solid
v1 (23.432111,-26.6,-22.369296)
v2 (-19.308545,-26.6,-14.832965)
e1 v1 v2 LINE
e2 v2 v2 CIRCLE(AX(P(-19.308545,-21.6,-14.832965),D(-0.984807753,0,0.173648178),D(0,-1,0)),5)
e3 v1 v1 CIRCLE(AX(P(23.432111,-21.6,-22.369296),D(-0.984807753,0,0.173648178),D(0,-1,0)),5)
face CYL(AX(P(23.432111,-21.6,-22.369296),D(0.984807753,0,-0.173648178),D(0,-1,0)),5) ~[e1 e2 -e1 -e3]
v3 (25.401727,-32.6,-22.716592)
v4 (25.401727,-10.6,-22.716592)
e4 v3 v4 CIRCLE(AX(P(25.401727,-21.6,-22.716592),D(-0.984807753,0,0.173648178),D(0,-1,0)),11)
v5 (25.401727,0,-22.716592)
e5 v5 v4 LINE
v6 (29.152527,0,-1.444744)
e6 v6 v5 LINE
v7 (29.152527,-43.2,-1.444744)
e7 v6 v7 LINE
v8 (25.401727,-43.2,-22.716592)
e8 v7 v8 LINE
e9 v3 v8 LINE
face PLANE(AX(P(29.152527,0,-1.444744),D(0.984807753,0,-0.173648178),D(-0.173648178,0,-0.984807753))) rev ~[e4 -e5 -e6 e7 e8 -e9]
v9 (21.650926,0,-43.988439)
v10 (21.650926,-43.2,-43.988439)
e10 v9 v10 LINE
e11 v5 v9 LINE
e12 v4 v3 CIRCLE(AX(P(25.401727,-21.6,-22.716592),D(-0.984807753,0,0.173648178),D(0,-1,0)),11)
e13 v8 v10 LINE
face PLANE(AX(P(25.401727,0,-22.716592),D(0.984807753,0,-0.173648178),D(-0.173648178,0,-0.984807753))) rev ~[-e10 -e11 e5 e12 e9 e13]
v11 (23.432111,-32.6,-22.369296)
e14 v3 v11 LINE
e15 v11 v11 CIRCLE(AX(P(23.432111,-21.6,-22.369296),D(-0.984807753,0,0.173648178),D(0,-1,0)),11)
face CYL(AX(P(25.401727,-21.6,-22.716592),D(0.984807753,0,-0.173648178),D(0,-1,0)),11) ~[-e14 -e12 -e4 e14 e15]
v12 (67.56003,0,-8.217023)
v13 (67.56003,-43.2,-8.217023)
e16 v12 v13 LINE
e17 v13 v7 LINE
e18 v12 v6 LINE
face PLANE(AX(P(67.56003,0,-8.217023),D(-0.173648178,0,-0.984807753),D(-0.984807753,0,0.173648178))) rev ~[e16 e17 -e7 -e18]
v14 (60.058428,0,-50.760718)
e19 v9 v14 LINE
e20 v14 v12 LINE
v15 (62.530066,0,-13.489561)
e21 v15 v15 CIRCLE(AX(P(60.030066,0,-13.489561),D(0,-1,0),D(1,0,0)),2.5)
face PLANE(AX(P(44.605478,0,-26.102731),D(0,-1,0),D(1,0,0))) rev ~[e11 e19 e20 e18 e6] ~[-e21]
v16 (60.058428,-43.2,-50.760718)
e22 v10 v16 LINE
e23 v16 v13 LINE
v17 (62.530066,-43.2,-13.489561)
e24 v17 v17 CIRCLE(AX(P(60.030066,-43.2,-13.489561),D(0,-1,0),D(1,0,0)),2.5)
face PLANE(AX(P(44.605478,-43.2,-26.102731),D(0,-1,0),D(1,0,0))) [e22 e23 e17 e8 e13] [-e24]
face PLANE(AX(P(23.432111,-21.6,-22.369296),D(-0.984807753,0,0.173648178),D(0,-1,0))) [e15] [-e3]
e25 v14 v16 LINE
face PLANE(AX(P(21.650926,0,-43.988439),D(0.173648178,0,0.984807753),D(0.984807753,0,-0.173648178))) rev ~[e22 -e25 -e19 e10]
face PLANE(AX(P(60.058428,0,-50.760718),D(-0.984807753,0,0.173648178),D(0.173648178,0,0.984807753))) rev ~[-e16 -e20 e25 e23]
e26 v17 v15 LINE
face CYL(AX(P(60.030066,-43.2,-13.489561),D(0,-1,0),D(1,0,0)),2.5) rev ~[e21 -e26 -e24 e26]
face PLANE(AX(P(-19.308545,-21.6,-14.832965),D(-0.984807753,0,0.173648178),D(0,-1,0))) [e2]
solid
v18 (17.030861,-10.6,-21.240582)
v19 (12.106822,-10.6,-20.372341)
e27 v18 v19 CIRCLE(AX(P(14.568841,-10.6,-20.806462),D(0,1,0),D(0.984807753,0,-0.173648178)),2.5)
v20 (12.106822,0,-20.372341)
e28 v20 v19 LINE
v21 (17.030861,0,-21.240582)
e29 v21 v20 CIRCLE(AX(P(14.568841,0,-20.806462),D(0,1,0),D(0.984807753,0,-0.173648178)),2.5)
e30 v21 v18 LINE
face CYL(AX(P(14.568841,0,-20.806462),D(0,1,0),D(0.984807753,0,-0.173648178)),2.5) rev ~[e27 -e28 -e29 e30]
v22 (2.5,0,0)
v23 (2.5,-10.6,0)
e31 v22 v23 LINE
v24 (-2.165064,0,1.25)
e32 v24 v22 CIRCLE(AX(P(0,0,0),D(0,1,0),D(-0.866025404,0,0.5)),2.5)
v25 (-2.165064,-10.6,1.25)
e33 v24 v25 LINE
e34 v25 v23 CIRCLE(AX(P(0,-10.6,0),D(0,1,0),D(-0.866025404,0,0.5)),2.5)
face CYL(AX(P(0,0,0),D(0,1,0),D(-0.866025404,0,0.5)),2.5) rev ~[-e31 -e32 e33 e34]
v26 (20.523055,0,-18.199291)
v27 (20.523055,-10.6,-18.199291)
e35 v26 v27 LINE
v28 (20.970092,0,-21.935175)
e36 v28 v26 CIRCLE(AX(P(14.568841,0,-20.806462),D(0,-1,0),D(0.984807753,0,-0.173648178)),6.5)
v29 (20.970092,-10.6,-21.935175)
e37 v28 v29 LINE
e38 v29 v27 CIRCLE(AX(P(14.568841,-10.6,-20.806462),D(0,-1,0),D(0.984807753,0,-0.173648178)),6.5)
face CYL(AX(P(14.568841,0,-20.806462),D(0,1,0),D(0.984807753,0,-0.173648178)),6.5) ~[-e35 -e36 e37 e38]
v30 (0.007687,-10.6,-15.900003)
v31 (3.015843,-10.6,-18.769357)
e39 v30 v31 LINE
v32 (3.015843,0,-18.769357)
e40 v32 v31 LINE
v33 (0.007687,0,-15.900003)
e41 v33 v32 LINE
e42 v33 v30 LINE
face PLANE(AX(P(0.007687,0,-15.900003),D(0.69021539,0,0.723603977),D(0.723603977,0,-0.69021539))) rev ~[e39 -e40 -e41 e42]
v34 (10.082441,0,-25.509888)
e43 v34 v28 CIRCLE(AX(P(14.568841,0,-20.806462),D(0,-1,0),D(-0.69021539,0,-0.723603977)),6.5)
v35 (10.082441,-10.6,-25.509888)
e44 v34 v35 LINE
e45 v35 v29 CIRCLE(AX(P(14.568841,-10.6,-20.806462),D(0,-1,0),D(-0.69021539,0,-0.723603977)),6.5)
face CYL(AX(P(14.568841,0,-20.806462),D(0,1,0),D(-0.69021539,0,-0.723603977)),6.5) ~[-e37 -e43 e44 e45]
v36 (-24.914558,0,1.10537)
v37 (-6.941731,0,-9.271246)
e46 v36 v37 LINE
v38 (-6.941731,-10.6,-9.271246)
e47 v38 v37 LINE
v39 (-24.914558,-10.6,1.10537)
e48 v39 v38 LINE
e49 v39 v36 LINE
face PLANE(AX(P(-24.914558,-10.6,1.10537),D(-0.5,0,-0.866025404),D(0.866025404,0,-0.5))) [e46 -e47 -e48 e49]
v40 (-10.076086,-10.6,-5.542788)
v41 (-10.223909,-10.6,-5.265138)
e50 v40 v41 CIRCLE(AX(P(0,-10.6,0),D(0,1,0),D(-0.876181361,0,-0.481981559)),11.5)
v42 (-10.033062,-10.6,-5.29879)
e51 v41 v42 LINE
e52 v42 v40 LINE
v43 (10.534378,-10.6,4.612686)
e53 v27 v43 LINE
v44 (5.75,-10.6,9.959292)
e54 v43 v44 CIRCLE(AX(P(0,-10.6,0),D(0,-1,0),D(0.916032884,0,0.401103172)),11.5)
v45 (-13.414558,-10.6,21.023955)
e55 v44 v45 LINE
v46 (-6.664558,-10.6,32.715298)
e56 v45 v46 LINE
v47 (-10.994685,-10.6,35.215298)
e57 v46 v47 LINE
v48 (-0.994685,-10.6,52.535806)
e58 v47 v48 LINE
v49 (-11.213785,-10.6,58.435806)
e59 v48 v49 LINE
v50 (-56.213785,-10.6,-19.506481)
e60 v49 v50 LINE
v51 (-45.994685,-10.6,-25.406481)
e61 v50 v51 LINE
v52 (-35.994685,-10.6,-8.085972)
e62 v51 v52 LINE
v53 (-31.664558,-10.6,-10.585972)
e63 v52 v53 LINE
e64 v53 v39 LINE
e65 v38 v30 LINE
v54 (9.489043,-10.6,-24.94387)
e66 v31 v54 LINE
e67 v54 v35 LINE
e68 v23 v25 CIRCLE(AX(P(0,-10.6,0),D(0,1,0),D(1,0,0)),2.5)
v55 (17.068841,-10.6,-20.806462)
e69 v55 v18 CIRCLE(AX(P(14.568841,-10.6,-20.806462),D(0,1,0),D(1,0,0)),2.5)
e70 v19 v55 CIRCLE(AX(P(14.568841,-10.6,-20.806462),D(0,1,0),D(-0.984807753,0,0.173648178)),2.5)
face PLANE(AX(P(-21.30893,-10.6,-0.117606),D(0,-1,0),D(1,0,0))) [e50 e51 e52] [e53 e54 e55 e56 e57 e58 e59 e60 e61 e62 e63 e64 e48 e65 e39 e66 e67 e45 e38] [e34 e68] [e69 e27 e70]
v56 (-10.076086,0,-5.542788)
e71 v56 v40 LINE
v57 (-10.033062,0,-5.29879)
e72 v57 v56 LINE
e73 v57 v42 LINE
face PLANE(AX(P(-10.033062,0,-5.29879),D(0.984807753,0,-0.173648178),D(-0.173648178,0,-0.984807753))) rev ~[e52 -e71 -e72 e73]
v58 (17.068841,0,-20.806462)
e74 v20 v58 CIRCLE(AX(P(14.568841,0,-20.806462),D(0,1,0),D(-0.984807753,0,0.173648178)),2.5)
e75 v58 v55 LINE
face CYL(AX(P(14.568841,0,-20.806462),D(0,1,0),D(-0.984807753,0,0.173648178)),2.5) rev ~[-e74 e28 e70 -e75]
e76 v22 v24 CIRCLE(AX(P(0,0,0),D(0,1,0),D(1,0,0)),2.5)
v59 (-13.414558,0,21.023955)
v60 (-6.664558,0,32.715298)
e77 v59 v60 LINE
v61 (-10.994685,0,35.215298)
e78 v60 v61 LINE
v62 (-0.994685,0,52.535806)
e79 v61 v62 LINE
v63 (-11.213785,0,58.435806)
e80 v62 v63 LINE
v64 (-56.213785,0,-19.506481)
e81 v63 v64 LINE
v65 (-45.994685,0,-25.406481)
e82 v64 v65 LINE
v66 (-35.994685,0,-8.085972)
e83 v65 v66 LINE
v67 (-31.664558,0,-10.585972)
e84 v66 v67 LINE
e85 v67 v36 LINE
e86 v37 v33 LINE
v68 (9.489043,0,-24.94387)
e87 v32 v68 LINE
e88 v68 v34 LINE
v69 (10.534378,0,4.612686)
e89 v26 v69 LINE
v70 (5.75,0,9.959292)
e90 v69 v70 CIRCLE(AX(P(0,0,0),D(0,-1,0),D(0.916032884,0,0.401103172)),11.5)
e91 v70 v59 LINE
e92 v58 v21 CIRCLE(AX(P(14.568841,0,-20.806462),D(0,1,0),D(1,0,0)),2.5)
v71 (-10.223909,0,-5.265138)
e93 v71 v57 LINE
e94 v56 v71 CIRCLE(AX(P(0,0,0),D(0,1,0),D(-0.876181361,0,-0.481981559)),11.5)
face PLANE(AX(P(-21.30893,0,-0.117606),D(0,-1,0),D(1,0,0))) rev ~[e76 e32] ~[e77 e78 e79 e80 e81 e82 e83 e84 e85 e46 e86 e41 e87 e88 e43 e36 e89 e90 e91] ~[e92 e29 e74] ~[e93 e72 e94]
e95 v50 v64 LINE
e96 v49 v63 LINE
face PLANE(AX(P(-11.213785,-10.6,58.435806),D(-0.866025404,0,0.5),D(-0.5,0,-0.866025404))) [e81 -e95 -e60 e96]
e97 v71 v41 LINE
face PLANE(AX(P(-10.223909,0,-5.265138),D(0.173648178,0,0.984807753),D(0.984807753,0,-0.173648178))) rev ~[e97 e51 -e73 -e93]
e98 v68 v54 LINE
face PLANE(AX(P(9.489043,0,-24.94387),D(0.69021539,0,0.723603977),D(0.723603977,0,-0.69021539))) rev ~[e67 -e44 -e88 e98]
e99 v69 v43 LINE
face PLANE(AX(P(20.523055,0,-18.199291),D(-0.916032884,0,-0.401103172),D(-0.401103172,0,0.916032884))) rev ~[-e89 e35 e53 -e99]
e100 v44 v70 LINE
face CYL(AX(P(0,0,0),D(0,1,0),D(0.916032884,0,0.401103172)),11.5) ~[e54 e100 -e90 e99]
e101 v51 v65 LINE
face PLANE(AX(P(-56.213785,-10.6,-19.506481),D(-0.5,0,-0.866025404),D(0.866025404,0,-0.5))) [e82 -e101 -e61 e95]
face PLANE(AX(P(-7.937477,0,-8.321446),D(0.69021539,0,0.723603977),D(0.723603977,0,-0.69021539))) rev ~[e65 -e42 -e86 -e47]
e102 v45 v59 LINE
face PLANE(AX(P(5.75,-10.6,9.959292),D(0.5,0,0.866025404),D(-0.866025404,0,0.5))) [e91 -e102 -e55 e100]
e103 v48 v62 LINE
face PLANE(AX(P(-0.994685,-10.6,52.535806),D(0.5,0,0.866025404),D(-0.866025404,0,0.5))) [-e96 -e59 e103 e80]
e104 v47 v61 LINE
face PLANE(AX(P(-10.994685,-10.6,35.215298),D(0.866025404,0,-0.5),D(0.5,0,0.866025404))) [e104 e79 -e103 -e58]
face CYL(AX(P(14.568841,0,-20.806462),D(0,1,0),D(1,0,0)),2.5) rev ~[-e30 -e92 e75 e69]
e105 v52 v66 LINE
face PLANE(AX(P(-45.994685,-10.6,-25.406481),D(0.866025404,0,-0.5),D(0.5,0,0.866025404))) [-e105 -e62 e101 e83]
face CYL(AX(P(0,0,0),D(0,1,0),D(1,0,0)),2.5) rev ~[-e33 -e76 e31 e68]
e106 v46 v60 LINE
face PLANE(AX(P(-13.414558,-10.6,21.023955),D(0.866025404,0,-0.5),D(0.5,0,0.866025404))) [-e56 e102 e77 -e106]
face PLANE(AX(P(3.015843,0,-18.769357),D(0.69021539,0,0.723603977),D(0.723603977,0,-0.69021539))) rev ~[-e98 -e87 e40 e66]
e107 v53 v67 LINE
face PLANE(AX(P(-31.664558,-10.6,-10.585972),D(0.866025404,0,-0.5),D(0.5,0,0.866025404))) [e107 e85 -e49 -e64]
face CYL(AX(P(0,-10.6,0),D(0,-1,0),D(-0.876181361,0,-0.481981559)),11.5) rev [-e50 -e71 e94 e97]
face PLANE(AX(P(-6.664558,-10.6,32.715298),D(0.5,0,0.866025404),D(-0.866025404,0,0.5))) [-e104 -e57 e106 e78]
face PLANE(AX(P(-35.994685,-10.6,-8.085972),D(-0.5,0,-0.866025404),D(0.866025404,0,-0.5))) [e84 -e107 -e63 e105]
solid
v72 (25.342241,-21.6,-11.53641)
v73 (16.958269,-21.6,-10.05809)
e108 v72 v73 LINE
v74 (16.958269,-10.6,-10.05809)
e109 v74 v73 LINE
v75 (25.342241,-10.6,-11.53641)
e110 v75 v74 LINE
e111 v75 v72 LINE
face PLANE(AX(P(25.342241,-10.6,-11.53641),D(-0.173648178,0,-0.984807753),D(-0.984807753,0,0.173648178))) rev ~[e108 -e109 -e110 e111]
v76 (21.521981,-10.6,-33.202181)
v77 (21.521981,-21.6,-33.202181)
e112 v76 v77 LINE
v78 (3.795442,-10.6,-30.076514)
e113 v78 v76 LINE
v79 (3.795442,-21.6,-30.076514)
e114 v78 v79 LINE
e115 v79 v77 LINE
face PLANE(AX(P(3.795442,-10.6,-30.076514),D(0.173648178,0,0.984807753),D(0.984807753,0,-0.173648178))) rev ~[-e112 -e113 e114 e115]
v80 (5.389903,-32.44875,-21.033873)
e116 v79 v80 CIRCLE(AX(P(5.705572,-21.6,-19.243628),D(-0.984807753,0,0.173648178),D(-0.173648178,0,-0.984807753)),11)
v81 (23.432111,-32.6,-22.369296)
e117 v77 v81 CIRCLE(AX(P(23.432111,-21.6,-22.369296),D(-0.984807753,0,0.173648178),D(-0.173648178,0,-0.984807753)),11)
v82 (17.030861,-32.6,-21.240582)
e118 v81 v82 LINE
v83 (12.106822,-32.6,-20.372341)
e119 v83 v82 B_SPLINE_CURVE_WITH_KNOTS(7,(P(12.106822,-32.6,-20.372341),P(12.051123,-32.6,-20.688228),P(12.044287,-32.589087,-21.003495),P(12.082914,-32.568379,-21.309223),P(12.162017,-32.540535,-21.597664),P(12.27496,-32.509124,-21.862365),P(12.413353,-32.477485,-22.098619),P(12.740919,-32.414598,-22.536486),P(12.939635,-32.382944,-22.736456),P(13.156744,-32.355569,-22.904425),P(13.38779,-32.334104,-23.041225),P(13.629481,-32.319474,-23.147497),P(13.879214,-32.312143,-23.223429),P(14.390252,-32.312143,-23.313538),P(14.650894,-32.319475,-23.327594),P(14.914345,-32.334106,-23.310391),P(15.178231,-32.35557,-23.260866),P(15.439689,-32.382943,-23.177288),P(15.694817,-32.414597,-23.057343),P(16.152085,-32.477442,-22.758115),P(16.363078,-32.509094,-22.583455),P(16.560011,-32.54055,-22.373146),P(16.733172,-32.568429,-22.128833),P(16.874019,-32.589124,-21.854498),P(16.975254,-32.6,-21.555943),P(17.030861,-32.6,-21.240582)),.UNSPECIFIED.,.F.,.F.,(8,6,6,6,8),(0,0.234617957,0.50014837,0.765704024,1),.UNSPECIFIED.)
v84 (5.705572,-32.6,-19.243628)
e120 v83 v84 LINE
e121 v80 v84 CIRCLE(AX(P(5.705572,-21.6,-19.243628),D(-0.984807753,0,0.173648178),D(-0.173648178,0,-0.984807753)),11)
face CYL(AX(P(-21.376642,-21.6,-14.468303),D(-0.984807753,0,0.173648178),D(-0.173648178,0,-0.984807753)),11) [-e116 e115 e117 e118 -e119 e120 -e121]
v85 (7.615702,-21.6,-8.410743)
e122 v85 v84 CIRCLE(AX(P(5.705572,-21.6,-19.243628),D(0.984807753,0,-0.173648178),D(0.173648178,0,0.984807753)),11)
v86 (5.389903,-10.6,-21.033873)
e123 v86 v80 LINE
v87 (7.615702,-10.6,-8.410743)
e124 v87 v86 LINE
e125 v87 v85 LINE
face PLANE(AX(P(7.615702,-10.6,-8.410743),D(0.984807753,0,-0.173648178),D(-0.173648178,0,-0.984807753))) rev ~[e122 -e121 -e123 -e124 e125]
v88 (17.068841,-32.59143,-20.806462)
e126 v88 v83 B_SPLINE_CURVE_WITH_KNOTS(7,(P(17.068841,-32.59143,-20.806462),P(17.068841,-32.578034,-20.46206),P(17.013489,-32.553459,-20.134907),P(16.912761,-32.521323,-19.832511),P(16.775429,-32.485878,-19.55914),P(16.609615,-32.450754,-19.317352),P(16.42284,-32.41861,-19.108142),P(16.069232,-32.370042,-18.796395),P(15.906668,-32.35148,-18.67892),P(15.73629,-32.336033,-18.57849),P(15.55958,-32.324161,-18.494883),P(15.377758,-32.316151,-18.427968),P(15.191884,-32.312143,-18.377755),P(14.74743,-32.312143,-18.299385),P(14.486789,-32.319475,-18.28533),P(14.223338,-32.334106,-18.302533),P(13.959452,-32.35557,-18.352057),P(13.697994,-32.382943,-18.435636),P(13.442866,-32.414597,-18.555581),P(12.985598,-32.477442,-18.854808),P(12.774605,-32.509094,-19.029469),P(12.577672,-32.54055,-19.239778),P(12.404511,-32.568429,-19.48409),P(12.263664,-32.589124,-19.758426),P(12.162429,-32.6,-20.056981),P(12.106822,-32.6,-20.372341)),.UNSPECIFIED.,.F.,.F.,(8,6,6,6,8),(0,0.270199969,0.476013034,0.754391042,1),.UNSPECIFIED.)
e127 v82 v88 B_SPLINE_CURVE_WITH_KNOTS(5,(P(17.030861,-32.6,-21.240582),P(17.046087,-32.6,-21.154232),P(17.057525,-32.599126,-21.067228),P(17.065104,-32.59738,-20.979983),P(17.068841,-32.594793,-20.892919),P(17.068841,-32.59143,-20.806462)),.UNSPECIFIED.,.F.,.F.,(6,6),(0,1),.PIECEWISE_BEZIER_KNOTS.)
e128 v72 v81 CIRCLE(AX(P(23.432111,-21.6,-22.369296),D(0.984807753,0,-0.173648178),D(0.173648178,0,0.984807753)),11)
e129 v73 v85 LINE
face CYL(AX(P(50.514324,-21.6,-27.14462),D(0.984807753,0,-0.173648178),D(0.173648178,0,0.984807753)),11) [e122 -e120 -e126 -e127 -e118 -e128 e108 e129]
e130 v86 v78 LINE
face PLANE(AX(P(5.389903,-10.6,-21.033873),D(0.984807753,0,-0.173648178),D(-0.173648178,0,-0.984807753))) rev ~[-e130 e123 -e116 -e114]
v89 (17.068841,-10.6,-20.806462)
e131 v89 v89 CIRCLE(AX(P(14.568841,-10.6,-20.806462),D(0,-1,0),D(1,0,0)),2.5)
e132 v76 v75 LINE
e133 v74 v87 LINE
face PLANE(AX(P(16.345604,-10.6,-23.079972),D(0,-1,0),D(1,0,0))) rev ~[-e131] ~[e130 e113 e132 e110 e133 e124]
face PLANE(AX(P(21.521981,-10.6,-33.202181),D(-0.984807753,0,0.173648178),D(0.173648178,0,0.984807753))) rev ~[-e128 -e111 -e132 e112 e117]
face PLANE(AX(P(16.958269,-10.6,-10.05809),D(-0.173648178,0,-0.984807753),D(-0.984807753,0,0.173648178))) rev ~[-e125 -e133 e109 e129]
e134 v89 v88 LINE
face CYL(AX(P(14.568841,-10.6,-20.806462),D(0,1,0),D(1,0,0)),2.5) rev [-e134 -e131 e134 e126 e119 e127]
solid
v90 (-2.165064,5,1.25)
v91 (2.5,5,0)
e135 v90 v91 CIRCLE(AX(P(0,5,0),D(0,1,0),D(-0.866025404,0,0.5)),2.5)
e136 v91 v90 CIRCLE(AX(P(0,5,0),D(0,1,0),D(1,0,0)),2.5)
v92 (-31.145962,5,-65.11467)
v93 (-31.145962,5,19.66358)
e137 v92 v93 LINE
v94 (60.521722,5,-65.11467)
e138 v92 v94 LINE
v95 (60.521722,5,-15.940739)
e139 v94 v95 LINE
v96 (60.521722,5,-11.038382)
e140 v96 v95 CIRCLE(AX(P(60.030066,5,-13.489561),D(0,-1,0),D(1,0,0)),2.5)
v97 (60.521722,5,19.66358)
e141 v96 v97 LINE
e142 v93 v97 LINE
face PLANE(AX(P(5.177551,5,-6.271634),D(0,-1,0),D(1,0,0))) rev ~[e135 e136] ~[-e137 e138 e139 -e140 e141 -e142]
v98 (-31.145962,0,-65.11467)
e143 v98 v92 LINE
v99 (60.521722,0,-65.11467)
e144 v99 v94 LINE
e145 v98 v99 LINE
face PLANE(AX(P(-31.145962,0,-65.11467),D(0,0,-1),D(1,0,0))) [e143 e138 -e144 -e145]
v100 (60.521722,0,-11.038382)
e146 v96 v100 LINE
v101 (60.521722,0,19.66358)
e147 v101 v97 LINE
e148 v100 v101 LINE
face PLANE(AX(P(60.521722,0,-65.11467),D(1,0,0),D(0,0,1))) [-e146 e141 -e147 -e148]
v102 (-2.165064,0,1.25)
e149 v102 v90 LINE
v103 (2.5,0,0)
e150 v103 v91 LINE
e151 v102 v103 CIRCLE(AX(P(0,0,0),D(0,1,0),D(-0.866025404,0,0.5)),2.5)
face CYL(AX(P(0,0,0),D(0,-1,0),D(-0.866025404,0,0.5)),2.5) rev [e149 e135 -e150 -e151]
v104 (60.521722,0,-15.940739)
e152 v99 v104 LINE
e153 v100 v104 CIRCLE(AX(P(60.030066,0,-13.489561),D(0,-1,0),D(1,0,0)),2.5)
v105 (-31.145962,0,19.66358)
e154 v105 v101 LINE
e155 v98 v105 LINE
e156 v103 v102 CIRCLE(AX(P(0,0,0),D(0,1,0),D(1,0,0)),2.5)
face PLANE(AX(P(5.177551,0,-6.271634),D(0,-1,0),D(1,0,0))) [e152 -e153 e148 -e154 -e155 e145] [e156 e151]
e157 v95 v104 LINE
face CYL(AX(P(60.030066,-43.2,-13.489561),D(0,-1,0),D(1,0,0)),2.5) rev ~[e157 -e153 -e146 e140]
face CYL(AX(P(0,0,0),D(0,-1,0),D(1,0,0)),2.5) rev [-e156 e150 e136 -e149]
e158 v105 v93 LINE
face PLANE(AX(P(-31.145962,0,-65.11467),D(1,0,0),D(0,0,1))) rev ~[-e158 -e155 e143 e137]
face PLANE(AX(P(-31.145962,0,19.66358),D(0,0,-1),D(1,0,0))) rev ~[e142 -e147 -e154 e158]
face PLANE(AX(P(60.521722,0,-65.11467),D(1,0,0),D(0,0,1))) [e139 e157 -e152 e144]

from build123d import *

# Parameters (mm, degrees)
F1_DEPTH    = 10.6
F2_DEPTH    = 43.2
F3_R        = 11
F4_DEPTH    = 2
F5_R        = 5
F6_DEPTH    = 43.4
F7_R        = 2.5
F8_DEPTH    = 22
F9_T1_DEPTH = 73
F9_T3_DEPTH = 73
F10_W       = 91.6676837951
F10_H       = 84.7782492638
F11_DEPTH   = 5
F12_R       = 2.5
F13_DEPTH   = 74.8
F15_DEPTH   = 10.6


# Not quite as in the source:
# - a fillet or chamfer that OpenCascade refuses, or shapes differently, is made with other operations: its cross-section is extruded or revolved along the edge and cut away or added
# - a feature of the source that left no trace in its solid (it failed there, or was rolled back) is left out
# - a feature names something its author has since deleted; it is built from what else it names


with BuildPart() as f1:
    # F0 (on Front) → F1 (new body)
    with BuildSketch(Plane.XZ):
        with BuildLine():
            Line((20.5230552312, -18.1992913043), (10.5343781692, 4.6126864827))
            ThreePointArc((10.5343781692, 4.6126864827), (0.6372216988, 11.4823320152), (-9.9592921435, 5.75))
            ThreePointArc((-9.9592921435, 5.75), (-11.496683076, 0.276185173), (-10.2239091523, -5.2651383312))
            Line((-10.2239091523, -5.2651383312), (-10.0330621935, -5.2987897992))
            Line((-10.0330621935, -5.2987897992), (-10.0760856471, -5.5427879295))
            ThreePointArc((-10.0760856471, -5.5427879295), (-9.1133059009, -7.0141040451), (-7.937476981, -8.3214457383))
            Line((-7.937476981, -8.3214457383), (0.0076867142, -15.9000031098))
            ThreePointArc((0.0076867142, -15.9000031098), (4.1721880916, -16.865197921), (7.4918654025, -19.5586001001))
            Line((7.4918654025, -19.5586001001), (12.1068221008, -20.3723414808))
            ThreePointArc((12.1068221008, -20.3723414808), (14.7867308402, -18.3159751797), (17.0688414833, -20.8064619249))
            ThreePointArc((17.0688414833, -20.8064619249), (17.0593282285, -21.0243512818), (17.0308608658, -21.2405823691))
            Line((17.0308608658, -21.2405823691), (20.9700918779, -21.9351750798))
            ThreePointArc((20.9700918779, -21.9351750798), (21.0227999926, -20.0341798777), (20.5230552312, -18.1992913043))
        make_face()
        with BuildLine():
            ThreePointArc((2.5, 0), (-0.6470476128, -2.4148145657), (-2.1650635095, 1.25))
            ThreePointArc((-2.1650635095, 1.25), (0.6470476128, 2.4148145657), (2.5, 0))
        make_face(mode=Mode.SUBTRACT)
        with BuildLine():
            ThreePointArc((10.0824414506, -25.509887777), (16.5964769767, -26.9821152755), (20.9700918779, -21.9351750798))
            Line((20.9700918779, -21.9351750798), (17.0308608658, -21.2405823691))
            ThreePointArc((17.0308608658, -21.2405823691), (14.1347210391, -23.2684813075), (12.1068221008, -20.3723414808))
            Line((12.1068221008, -20.3723414808), (7.4918654025, -19.5586001001))
            ThreePointArc((7.4918654025, -19.5586001001), (8.9071937501, -22.0966835606), (9.4890434601, -24.9438704))
            Line((9.4890434601, -24.9438704), (10.0824414506, -25.509887777))
        make_face()
        with BuildLine():
            Line((3.0158426859, -18.7693565289), (9.4890434601, -24.9438704))
            ThreePointArc((9.4890434601, -24.9438704), (8.9071937501, -22.0966835606), (7.4918654025, -19.5586001001))
            Line((7.4918654025, -19.5586001001), (3.0158426859, -18.7693565289))
        make_face()
        with BuildLine():
            ThreePointArc((7.4918654025, -19.5586001001), (4.1721880916, -16.865197921), (0.0076867142, -15.9000031098))
            Line((0.0076867142, -15.9000031098), (3.0158426859, -18.7693565289))
            Line((3.0158426859, -18.7693565289), (7.4918654025, -19.5586001001))
        make_face()
    extrude(amount=F1_DEPTH)

    # F14 (on face) → F15 (join)
    with BuildSketch(Plane.XZ.offset(10.6)):
        with BuildLine():
            Line((-31.664557856, -10.5859724576), (-24.914557856, 1.1053704935))
            Line((-24.914557856, 1.1053704935), (-6.941731015, -9.2712459212))
            Line((-6.941731015, -9.2712459212), (-7.937476981, -8.3214457383))
            ThreePointArc((-7.937476981, -8.3214457383), (-9.1133059009, -7.0141040451), (-10.0760856471, -5.5427879295))
            ThreePointArc((-10.0760856471, -5.5427879295), (-10.1509467311, -5.4044685642), (-10.2239091523, -5.2651383312))
            ThreePointArc((-10.2239091523, -5.2651383312), (-11.496683076, 0.276185173), (-9.9592921435, 5.75))
            Line((-9.9592921435, 5.75), (-23.4946848749, 13.564662637))
            Line((-23.4946848749, 13.564662637), (-35.9946848749, -8.0859724576))
            Line((-35.9946848749, -8.0859724576), (-31.664557856, -10.5859724576))
        make_face()
        with BuildLine():
            Line((-17.7446848749, 23.5239547806), (-23.4946848749, 13.564662637))
            Line((-23.4946848749, 13.564662637), (-9.9592921435, 5.75))
            ThreePointArc((-9.9592921435, 5.75), (-2.9764190187, 11.1081470023), (5.75, 9.9592921435))
            Line((5.75, 9.9592921435), (-13.414557856, 21.0239547806))
            Line((-13.414557856, 21.0239547806), (-6.664557856, 32.7152977317))
            Line((-6.664557856, 32.7152977317), (-10.9946848749, 35.2152977317))
            Line((-10.9946848749, 35.2152977317), (-17.7446848749, 23.5239547806))
        make_face()
        Polygon((-41.6238499995, -4.8359724576), (-35.9946848749, -8.0859724576), (-23.4946848749, 13.564662637), (-17.7446848749, 23.5239547806), (-10.9946848749, 35.2152977317), (-16.6238499995, 38.4652977317), align=None)
        Polygon((-45.9946848749, -25.4064805333), (-35.9946848749, -8.0859724576), (-41.6238499995, -4.8359724576), (-16.6238499995, 38.4652977317), (-10.9946848749, 35.2152977317), (-0.9946848749, 52.5358058073), (-11.2137846395, 58.4358058073), (-56.2137846395, -19.5064805333), align=None)
    extrude(amount=-F15_DEPTH)


with BuildPart() as f2:
    # F0 (on Front) → F2 (new body)
    with BuildSketch(Plane.XZ):
        Polygon((29.1525274041, -1.4447444142), (25.4017267665, -22.7165918793), (21.6509261288, -43.9884393443), (60.0584284963, -50.7607182734), (67.5600297715, -8.2170233432), align=None)
    extrude(amount=F2_DEPTH)

    # F3 (on face) → F4 (join)
    with BuildSketch(Plane(origin=(28.5205369873, 0, -5.0289401751), x_dir=(0, -1, 0), z_dir=(-0.984807753, 0, 0.1736481777))):
        with Locations((21.6, -17.9605122421)):
            Circle(F3_R)
    extrude(amount=F4_DEPTH)

    # F5 (on face) → F6 (join)
    with BuildSketch(Plane(origin=(26.5509214812, 0, -4.6816438198), x_dir=(0, -1, 0), z_dir=(-0.984807753, 0, 0.1736481777))):
        with Locations((21.6, -17.9605122421)):
            Circle(F5_R)
    extrude(amount=F6_DEPTH)


with BuildPart() as f8:
    # F7 (on face) → F8 (new body)
    with BuildSketch(Plane.XZ.offset(10.6)):
        with BuildLine():
            Line((3.7954417519, -30.0765136091), (21.5219813061, -33.2021808071))
            Line((21.5219813061, -33.2021808071), (25.3422412148, -11.5364102408))
            Line((25.3422412148, -11.5364102408), (16.9582685695, -10.0580896579))
            Line((16.9582685695, -10.0580896579), (20.5230552312, -18.1992913043))
            ThreePointArc((20.5230552312, -18.1992913043), (18.2970883196, -26.1309502128), (10.0824414506, -25.509887777))
            Line((10.0824414506, -25.509887777), (5.3899032629, -21.0338730293))
            Line((5.3899032629, -21.0338730293), (3.7954417519, -30.0765136091))
        make_face()
        with BuildLine():
            Line((20.5230552312, -18.1992913043), (16.9582685695, -10.0580896579))
            Line((16.9582685695, -10.0580896579), (7.6157016605, -8.4107430428))
            Line((7.6157016605, -8.4107430428), (5.3899032629, -21.0338730293))
            Line((5.3899032629, -21.0338730293), (10.0824414506, -25.509887777))
            ThreePointArc((10.0824414506, -25.509887777), (18.2970883196, -26.1309502128), (20.5230552312, -18.1992913043))
        make_face()
        with Locations((14.5688414833, -20.8064619249)):
            Circle(F7_R, mode=Mode.SUBTRACT)
    extrude(amount=F8_DEPTH)

    # F9: fillet of radius 11 on 2 edges, made by hand

    # F9_s2 → F9_t1 (cut)
    with BuildSketch(Plane(origin=(53.6331346891, 0, -9.4569687057), x_dir=(0, 1, 0), z_dir=(-0.984807753, 0, 0.1736481777))):
        with BuildLine():
            ThreePointArc((-21.6, 6.9605122421), (-29.3781745931, 10.1823376491), (-32.6, 17.9605122421))
            Line((-32.6, 17.9605122421), (-32.6, 6.9605122421))
            Line((-32.6, 6.9605122421), (-21.6, 6.9605122421))
        make_face()
    extrude(amount=F9_T1_DEPTH, mode=Mode.SUBTRACT)

    # F9_s4 → F9_t3 (cut)
    with BuildSketch(Plane(origin=(-18.2578312808, 0, 3.219348264), x_dir=(0, 1, 0), z_dir=(0.984807753, 0, -0.1736481777))):
        with BuildLine():
            ThreePointArc((-21.6, -28.9605122421), (-29.3781745931, -25.7386868352), (-32.6, -17.9605122421))
            Line((-32.6, -17.9605122421), (-32.6, -28.9605122421))
            Line((-32.6, -28.9605122421), (-21.6, -28.9605122421))
        make_face()
    extrude(amount=F9_T3_DEPTH, mode=Mode.SUBTRACT)


with BuildPart() as f11:
    # F10 (on face) → F11 (new body)
    with BuildSketch(Plane.XZ):
        with Locations((14.6878799424, -22.7255448699)):
            Rectangle(F10_W, F10_H)
        with BuildLine():
            Line((10.5343781692, 4.6126864827), (20.5230552312, -18.1992913043))
            ThreePointArc((20.5230552312, -18.1992913043), (21.0227999926, -20.0341798777), (20.9700918779, -21.9351750798))
            Line((20.9700918779, -21.9351750798), (17.0308608658, -21.2405823691))
            ThreePointArc((17.0308608658, -21.2405823691), (17.0593282285, -21.0243512818), (17.0688414833, -20.8064619249))
            ThreePointArc((17.0688414833, -20.8064619249), (14.7867308402, -18.3159751797), (12.1068221008, -20.3723414808))
            Line((12.1068221008, -20.3723414808), (7.4918654025, -19.5586001001))
            ThreePointArc((7.4918654025, -19.5586001001), (4.1721880916, -16.865197921), (0.0076867142, -15.9000031098))
            Line((0.0076867142, -15.9000031098), (-7.937476981, -8.3214457383))
            ThreePointArc((-7.937476981, -8.3214457383), (-9.1133059009, -7.0141040451), (-10.0760856471, -5.5427879295))
            Line((-10.0760856471, -5.5427879295), (-10.0330621935, -5.2987897992))
            Line((-10.0330621935, -5.2987897992), (-10.2239091523, -5.2651383312))
            ThreePointArc((-10.2239091523, -5.2651383312), (-11.496683076, 0.276185173), (-9.9592921435, 5.75))
            ThreePointArc((-9.9592921435, 5.75), (0.6372216988, 11.4823320152), (10.5343781692, 4.6126864827))
        make_face(mode=Mode.SUBTRACT)
    extrude(amount=-F11_DEPTH)

    # F0 (on Front) → F11, piece 2 (join)
    with BuildSketch(Plane.XZ):
        with BuildLine():
            Line((20.5230552312, -18.1992913043), (10.5343781692, 4.6126864827))
            ThreePointArc((10.5343781692, 4.6126864827), (0.6372216988, 11.4823320152), (-9.9592921435, 5.75))
            ThreePointArc((-9.9592921435, 5.75), (-11.496683076, 0.276185173), (-10.2239091523, -5.2651383312))
            Line((-10.2239091523, -5.2651383312), (-10.0330621935, -5.2987897992))
            Line((-10.0330621935, -5.2987897992), (-10.0760856471, -5.5427879295))
            ThreePointArc((-10.0760856471, -5.5427879295), (-9.1133059009, -7.0141040451), (-7.937476981, -8.3214457383))
            Line((-7.937476981, -8.3214457383), (0.0076867142, -15.9000031098))
            ThreePointArc((0.0076867142, -15.9000031098), (4.1721880916, -16.865197921), (7.4918654025, -19.5586001001))
            Line((7.4918654025, -19.5586001001), (12.1068221008, -20.3723414808))
            ThreePointArc((12.1068221008, -20.3723414808), (14.7867308402, -18.3159751797), (17.0688414833, -20.8064619249))
            ThreePointArc((17.0688414833, -20.8064619249), (17.0593282285, -21.0243512818), (17.0308608658, -21.2405823691))
            Line((17.0308608658, -21.2405823691), (20.9700918779, -21.9351750798))
            ThreePointArc((20.9700918779, -21.9351750798), (21.0227999926, -20.0341798777), (20.5230552312, -18.1992913043))
        make_face()
        with BuildLine():
            ThreePointArc((2.5, 0), (-0.6470476128, -2.4148145657), (-2.1650635095, 1.25))
            ThreePointArc((-2.1650635095, 1.25), (0.6470476128, 2.4148145657), (2.5, 0))
        make_face(mode=Mode.SUBTRACT)
        with BuildLine():
            ThreePointArc((12.1068221008, -20.3723414808), (14.1347210391, -23.2684813075), (17.0308608658, -21.2405823691))
            Line((17.0308608658, -21.2405823691), (12.1068221008, -20.3723414808))
        make_face()
        with BuildLine():
            Line((12.1068221008, -20.3723414808), (17.0308608658, -21.2405823691))
            ThreePointArc((17.0308608658, -21.2405823691), (17.0593282285, -21.0243512818), (17.0688414833, -20.8064619249))
            ThreePointArc((17.0688414833, -20.8064619249), (14.7867308402, -18.3159751797), (12.1068221008, -20.3723414808))
        make_face()
    extrude(amount=-F11_DEPTH)


with BuildPart() as f13_tool:
    # F12 (on face) → F13 (new body)
    with BuildSketch(Plane.XZ.offset(43.2)):
        with Locations((60.0300662221, -13.489560583)):
            Circle(F12_R)
    extrude(amount=-F13_DEPTH)


with BuildPart() as f2_1:
    add(f2.part)

    # F13: cut by f13_tool
    add(f13_tool.part, mode=Mode.SUBTRACT)


with BuildPart() as f11_1:
    add(f11.part)

    # F13: cut by f13_tool
    add(f13_tool.part, mode=Mode.SUBTRACT)


solid = Compound([f1.part, f8.part, f2_1.part, f11_1.part])
